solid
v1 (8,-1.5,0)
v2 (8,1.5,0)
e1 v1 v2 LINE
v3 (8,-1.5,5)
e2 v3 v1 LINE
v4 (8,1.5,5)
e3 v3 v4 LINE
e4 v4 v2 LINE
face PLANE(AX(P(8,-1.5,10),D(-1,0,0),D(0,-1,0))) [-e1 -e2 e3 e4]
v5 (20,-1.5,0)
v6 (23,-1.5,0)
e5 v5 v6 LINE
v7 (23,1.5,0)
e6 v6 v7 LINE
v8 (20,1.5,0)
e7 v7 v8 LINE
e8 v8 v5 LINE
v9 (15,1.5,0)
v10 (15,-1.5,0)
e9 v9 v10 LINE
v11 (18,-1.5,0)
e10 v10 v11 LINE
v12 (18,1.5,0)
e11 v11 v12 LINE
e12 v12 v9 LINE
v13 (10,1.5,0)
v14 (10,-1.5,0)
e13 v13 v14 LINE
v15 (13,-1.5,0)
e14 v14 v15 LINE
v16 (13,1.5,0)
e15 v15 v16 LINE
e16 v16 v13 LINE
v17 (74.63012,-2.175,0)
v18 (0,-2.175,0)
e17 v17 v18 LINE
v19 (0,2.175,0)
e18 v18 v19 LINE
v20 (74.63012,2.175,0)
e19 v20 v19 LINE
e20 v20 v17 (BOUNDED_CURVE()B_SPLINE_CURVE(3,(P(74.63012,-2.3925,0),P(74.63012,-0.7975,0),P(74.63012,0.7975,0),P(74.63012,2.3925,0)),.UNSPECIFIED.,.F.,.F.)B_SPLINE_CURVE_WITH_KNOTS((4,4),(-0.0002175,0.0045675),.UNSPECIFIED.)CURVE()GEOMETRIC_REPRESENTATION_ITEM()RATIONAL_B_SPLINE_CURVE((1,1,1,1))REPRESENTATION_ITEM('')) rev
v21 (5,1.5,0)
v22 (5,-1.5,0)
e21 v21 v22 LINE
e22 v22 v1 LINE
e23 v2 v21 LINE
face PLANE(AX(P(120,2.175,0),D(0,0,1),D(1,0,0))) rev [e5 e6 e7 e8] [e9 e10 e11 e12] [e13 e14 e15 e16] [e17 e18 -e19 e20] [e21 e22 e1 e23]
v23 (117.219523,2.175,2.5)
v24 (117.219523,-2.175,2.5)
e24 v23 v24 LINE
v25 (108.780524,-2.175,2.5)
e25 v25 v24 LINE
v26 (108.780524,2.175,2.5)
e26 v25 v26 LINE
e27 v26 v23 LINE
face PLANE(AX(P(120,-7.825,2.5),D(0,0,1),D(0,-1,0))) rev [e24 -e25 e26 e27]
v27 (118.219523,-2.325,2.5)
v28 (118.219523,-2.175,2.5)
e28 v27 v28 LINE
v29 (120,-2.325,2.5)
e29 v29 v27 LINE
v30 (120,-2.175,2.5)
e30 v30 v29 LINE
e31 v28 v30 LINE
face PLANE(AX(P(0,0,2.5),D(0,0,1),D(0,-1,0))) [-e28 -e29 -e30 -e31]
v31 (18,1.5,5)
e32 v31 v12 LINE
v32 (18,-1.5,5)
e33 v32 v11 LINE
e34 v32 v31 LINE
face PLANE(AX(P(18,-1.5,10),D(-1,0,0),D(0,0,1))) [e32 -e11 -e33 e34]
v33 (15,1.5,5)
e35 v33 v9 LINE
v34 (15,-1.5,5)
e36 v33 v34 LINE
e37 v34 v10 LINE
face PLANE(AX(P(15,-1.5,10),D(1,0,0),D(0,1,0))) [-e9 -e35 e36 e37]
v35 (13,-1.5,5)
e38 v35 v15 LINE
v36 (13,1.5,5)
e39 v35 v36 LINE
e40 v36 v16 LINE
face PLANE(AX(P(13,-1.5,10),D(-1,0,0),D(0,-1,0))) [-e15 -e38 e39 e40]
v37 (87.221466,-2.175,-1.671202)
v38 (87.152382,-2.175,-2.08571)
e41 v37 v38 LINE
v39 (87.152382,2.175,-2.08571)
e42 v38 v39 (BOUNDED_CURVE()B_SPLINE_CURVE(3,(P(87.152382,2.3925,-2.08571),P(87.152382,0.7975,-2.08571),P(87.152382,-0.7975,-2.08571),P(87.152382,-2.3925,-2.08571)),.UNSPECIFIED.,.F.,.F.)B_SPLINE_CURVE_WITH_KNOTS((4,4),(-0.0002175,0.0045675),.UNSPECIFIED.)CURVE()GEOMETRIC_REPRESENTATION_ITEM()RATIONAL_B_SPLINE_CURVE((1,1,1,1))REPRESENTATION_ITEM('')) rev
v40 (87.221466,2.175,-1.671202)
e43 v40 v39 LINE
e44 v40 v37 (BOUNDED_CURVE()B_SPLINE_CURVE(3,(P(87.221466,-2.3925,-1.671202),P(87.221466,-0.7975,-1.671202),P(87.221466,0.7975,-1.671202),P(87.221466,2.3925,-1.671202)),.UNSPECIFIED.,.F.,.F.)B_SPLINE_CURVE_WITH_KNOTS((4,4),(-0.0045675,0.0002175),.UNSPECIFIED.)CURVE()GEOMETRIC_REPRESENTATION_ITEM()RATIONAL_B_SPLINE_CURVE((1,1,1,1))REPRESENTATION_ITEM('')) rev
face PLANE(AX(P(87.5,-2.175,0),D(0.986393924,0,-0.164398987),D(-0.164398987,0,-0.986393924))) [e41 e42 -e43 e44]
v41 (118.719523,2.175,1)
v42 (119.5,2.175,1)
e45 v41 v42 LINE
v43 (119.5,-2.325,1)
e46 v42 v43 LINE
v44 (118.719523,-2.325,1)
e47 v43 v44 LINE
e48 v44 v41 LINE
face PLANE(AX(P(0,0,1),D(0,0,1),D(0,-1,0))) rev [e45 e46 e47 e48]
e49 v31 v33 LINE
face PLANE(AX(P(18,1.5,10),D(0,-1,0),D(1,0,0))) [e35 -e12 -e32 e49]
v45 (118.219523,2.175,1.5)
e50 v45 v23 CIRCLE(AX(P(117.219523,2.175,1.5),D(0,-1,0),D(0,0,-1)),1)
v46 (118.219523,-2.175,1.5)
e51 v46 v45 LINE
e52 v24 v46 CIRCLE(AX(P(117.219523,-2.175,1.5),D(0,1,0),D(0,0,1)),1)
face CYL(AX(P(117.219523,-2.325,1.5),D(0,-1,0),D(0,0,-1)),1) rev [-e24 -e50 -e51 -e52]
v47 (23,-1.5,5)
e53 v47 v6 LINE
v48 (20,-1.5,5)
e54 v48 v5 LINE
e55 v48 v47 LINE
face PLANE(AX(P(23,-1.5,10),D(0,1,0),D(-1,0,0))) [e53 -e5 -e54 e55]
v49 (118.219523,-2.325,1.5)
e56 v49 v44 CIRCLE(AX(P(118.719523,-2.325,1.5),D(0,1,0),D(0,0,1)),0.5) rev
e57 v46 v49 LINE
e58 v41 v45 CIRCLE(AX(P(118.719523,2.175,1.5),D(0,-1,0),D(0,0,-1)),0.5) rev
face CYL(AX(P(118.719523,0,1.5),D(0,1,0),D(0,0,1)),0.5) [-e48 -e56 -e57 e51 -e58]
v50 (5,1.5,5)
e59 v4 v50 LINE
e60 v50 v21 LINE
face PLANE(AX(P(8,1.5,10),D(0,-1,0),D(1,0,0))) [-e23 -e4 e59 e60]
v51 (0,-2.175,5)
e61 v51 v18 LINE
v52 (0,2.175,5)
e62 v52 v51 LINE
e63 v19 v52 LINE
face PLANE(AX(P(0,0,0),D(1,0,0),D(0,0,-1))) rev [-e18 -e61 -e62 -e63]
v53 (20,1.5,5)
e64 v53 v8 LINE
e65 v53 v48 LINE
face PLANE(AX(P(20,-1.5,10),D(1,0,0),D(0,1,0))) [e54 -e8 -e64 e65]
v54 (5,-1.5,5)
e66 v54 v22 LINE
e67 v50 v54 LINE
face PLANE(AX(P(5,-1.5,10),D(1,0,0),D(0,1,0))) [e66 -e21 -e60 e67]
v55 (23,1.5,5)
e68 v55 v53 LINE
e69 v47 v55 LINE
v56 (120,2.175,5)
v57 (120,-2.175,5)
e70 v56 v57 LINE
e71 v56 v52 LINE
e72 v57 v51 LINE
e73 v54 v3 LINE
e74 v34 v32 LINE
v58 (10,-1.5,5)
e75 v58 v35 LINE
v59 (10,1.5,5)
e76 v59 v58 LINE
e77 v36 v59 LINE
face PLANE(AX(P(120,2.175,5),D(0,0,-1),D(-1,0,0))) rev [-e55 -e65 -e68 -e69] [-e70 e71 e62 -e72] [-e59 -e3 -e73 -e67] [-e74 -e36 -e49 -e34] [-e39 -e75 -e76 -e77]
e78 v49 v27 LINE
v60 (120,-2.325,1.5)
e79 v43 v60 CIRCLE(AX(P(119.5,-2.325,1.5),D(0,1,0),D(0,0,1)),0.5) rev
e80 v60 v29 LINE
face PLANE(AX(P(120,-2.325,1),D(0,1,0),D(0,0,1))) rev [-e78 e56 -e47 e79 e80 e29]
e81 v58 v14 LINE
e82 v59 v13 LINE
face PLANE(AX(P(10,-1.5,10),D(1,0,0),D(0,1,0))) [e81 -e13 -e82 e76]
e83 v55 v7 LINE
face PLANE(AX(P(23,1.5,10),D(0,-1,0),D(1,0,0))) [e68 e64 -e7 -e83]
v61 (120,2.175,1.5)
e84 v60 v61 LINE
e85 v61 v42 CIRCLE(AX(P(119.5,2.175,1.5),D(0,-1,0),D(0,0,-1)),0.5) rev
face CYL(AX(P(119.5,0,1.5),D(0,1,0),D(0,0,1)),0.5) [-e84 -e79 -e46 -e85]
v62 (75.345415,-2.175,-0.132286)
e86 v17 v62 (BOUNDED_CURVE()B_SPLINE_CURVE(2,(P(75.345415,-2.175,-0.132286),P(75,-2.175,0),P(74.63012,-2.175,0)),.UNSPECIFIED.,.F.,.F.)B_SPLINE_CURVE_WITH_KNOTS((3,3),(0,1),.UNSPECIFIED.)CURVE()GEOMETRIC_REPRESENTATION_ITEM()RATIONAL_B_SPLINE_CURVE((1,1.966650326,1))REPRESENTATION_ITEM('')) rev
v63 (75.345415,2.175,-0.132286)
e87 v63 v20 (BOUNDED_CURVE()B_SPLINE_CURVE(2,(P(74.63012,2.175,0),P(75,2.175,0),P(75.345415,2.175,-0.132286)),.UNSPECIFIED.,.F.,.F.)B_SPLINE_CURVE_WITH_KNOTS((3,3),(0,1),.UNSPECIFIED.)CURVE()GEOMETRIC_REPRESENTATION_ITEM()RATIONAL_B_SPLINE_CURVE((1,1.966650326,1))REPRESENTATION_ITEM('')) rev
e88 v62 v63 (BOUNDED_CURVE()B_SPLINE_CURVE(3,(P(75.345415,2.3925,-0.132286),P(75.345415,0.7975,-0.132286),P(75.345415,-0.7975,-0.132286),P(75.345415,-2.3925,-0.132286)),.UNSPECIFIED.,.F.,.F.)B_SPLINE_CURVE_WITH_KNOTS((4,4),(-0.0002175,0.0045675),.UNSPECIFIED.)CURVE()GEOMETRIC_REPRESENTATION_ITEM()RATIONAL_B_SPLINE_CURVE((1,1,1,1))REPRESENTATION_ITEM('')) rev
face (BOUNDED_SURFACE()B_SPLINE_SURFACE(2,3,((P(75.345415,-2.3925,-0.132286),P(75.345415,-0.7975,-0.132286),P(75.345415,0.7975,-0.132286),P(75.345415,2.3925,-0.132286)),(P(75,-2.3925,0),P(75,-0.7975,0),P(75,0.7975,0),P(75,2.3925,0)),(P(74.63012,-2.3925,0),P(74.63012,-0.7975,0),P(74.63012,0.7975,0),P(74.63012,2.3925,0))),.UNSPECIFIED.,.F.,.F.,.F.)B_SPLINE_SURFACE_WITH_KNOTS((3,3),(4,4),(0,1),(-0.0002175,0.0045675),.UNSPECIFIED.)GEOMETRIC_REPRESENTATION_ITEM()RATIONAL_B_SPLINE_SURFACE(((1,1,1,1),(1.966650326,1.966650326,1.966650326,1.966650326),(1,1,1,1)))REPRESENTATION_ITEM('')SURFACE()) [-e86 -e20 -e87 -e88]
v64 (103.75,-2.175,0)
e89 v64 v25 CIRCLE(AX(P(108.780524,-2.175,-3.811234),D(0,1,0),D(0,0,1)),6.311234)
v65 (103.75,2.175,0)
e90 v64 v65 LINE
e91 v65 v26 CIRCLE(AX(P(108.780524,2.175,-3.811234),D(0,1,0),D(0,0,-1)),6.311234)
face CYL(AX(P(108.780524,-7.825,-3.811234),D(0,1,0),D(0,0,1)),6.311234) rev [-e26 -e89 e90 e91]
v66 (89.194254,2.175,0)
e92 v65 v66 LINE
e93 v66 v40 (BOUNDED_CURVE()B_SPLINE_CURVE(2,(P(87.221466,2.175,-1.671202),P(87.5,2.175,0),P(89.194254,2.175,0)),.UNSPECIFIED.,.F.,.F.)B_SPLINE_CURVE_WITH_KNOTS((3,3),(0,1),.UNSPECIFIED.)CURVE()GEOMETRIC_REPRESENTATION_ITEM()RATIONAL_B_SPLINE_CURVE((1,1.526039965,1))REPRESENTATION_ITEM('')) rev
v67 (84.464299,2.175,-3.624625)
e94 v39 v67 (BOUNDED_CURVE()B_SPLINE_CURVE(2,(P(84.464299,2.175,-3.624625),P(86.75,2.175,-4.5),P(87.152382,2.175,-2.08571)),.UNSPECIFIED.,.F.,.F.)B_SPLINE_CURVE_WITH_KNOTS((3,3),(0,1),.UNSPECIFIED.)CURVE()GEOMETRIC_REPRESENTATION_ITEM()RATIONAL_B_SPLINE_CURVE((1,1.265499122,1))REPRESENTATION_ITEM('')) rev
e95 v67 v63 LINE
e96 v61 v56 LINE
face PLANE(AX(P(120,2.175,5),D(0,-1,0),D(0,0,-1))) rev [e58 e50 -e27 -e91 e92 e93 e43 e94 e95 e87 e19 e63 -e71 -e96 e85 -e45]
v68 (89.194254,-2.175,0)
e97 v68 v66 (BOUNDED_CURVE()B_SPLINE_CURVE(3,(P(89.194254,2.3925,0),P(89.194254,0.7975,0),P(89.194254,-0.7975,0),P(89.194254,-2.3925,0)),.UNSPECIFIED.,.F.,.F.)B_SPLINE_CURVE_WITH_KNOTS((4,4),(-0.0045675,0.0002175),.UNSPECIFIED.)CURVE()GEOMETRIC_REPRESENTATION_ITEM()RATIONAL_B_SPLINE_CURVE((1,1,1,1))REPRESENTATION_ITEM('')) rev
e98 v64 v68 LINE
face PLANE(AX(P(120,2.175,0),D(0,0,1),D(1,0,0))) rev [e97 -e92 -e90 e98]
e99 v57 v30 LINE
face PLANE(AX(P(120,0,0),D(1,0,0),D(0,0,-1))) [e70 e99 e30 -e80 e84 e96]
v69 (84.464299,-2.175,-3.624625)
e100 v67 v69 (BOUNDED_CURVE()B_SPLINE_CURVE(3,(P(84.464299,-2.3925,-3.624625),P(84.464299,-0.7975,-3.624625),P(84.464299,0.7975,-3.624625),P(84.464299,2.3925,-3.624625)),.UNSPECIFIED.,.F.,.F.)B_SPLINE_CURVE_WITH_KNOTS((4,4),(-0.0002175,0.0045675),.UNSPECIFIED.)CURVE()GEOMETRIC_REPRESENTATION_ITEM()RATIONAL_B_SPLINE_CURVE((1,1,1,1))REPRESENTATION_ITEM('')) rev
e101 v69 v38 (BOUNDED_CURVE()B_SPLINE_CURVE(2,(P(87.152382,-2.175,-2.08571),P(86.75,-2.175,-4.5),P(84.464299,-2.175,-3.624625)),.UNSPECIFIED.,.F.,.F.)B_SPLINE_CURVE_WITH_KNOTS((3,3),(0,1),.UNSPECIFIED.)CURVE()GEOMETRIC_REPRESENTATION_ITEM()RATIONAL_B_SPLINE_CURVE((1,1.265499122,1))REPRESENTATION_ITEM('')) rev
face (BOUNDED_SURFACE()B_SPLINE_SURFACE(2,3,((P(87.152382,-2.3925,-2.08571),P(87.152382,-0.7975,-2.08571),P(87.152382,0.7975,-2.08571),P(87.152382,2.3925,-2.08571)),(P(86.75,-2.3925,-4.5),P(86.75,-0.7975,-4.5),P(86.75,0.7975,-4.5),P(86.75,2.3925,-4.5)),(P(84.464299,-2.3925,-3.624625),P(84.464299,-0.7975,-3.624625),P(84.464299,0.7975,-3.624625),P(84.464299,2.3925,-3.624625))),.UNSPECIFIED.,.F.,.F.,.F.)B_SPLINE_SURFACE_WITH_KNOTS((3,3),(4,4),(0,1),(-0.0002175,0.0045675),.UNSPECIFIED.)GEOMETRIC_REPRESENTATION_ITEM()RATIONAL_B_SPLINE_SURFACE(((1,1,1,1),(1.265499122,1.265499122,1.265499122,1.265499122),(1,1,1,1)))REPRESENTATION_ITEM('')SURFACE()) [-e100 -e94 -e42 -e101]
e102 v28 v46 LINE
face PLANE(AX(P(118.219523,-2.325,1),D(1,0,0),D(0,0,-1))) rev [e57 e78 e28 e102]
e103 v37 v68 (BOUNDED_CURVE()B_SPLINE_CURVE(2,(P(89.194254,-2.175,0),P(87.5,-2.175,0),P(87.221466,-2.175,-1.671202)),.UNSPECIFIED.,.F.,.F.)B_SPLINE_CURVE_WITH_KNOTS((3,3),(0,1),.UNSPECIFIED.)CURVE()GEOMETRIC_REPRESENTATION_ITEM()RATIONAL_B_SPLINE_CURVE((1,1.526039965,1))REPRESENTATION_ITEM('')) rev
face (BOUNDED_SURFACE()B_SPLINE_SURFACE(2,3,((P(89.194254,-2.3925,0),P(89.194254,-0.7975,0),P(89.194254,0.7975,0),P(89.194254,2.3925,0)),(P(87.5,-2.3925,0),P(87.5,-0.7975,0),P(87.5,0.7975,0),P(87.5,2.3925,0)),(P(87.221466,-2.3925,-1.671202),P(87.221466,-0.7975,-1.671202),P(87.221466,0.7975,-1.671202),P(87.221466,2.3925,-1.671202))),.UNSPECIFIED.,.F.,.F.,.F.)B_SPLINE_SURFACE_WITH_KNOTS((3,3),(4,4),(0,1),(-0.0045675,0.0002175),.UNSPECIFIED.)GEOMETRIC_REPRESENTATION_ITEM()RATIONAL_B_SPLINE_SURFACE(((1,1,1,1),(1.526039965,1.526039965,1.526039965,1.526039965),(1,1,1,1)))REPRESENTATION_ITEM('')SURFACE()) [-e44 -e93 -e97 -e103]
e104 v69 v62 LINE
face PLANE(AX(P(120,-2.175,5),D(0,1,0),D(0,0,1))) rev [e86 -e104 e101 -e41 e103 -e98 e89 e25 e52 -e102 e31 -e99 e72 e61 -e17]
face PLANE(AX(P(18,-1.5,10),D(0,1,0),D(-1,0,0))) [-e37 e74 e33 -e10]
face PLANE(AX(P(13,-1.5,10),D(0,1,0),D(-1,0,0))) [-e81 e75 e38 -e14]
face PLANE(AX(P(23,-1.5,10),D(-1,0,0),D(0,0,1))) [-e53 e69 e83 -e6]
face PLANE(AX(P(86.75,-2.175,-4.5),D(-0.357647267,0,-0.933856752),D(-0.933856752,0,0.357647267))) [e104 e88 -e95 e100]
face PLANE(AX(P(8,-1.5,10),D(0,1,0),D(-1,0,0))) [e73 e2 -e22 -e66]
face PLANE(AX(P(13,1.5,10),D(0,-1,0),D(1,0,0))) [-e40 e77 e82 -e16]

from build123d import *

# Parameters (mm, degrees)
ESBO_O1_W                = 5
ESBO_O1_H                = 4.35
RESSALTO_EXTRUS_O1_DEPTH = 120
RESSALTO_EXTRUS_O2_DEPTH = 4.35
CUT_EXTRUDE2_DEPTH       = 10
CUT_EXTRUDE3_DEPTH       = 10
SKETCH17_W               = 1.7804771699968711
SKETCH17_H               = 4.499999999999998
BOSS_EXTRUDE2_DEPTH      = 1.5
FILLET8_R                = 1
FILLET9_R                = 0.5


with BuildPart() as part:
    # Esboço1 → Ressalto-extrusão1 (new body)
    with BuildSketch(Plane(origin=(0, 0, 0), x_dir=(0, 0, -1), z_dir=(1, 0, 0))):
        with Locations((-2.5000000000000098, 0)):
            Rectangle(ESBO_O1_W, ESBO_O1_H)
    extrude(amount=RESSALTO_EXTRUS_O1_DEPTH)

    # Esboço2 → Ressalto-extrusão2 (add)
    with BuildSketch(Plane(origin=(0, 2.175, 0), x_dir=(1, 0, 0), z_dir=(0, 1, 0))):
        Polygon((75, -9.63e-15), (87.5, -9.63e-15), (86.75, 4.49999999999999), align=None)
    extrude(amount=-RESSALTO_EXTRUS_O2_DEPTH)

    # Sketch12 → Cut-Extrude2 (cut)
    with BuildSketch(Plane(origin=(0, 2.175, 0), x_dir=(1, 0, 0), z_dir=(0, 1, 1.7e-16))):
        with BuildLine():
            Line((120, -2.5000000000000098), (108.78052366211932, -2.500000000000011))
            ThreePointArc((108.78052366211932, -2.500000000000011), (105.97177980074898, -1.8405473191538975), (103.75, -2.99e-15))
            Line((103.75, -2.99e-15), (120, -9.22e-15))
            Line((120, -9.22e-15), (120, -2.5000000000000098))
        make_face()
    extrude(amount=-CUT_EXTRUDE2_DEPTH, mode=Mode.SUBTRACT)

    # Fillet5
    # a fillet whose section is not a circle: 2 mm, written as the material it takes off along each edge
    with BuildSketch(Plane(origin=(86.75, 8.293980956389628, -4.49999999999999), x_dir=(-0.9338567516961642, 0, 0.35764726660704255), z_dir=(0, -1, 0))) as fillet5_piece_1:
        with BuildLine():
            Bezier((2.4475923825558348, 0), (6.4e-16, -1.66e-15), (0.48769743446495956, -2.3985119727784827), weights=[1, 1.2654991217782485, 1])
            Line((0.48769743446495956, -2.3985119727784827), (0, 0))
            Line((0, 0), (2.4475923825558348, 0))
        make_face()
    extrude(amount=16.587961912779257, mode=Mode.SUBTRACT)

    # Fillet6
    # a fillet whose section is not a circle: 2 mm, written as the material it adds along each edge
    with BuildSketch(Plane(origin=(75, 2.175, 9.63e-15), x_dir=(-1, 0, -2e-17), z_dir=(0, -1, 0))) as fillet6_piece_1:
        with BuildLine():
            Bezier((0.36987979207182775, 0), (0, 1e-17), (-0.3454147411422639, 0.13228649660767453), weights=[1, 1.966650325653325, 1])
            Line((-0.3454147411422639, 0.13228649660767453), (0, 0))
            Line((0, 0), (0.36987979207182775, 0))
        make_face()
    extrude(amount=4.35)

    # Fillet7
    # a fillet whose section is not a circle: 2 mm, written as the material it adds along each edge
    with BuildSketch(Plane(origin=(87.5, 2.175, 9.63e-15), x_dir=(1, 0, -1e-17), z_dir=(0, -1, 0))) as fillet7_piece_1:
        with BuildLine():
            Bezier((1.69425417676608, 0), (0, -1e-17), (-0.2785336708982129, -1.671202025389285), weights=[1, 1.5260399649454515, 1])
            Line((-0.2785336708982129, -1.671202025389285), (0, 0))
            Line((0, 0), (1.69425417676608, 0))
        make_face()
    extrude(amount=4.35)

    # Sketch16 → Cut-Extrude3 (cut)
    with BuildSketch(Plane.XY):
        Polygon((23.000000000000007, -1.4999999999999984), (20.000000000000007, -1.499999999999998), (20.000000000000004, 1.500000000000001), (23.000000000000007, 1.5000000000000013), align=None)
        Polygon((18.000000000000004, -1.4999999999999978), (15.000000000000002, -1.4999999999999984), (14.999999999999998, 1.5000000000000007), (18.000000000000004, 1.5000000000000013), align=None)
        Polygon((13.000000000000004, -1.4999999999999958), (10.000000000000002, -1.4999999999999964), (10.000000000000005, 1.5000000000000029), (13.000000000000007, 1.5000000000000036), align=None)
        Polygon((8, -1.4999999999999956), (5.000000000000001, -1.4999999999999953), (4.999999999999997, 1.500000000000004), (7.9999999999999964, 1.5000000000000038), align=None)
    extrude(amount=CUT_EXTRUDE3_DEPTH, mode=Mode.SUBTRACT)

    # Sketch17 → Boss-Extrude2 (add)
    with BuildSketch(Plane(origin=(2.9e-16, -4.3e-16, 2.500000000000023), x_dir=(-1, 0, 0), z_dir=(0, 1.7e-16, -1))):
        with Locations((-119.10976141500157, -0.07499999999999951)):
            Rectangle(SKETCH17_W, SKETCH17_H)
    extrude(amount=BOSS_EXTRUDE2_DEPTH)

    # Fillet8
    fillet8_edges = [part.edges().sort_by_distance(p)[0] for p in [
        (118.21952283000314, -4.3e-16, 2.500000000000023),
    ]]
    fillet(fillet8_edges, radius=FILLET8_R)

    # Fillet9
    fillet9_edges = [part.edges().sort_by_distance(p)[0] for p in [
        (120, -0.07499999999999947, 1.000000000000023),
        (118.21952283000314, -0.07499999999999991, 1.000000000000023),
    ]]
    fillet(fillet9_edges, radius=FILLET9_R)


solid = part.part
